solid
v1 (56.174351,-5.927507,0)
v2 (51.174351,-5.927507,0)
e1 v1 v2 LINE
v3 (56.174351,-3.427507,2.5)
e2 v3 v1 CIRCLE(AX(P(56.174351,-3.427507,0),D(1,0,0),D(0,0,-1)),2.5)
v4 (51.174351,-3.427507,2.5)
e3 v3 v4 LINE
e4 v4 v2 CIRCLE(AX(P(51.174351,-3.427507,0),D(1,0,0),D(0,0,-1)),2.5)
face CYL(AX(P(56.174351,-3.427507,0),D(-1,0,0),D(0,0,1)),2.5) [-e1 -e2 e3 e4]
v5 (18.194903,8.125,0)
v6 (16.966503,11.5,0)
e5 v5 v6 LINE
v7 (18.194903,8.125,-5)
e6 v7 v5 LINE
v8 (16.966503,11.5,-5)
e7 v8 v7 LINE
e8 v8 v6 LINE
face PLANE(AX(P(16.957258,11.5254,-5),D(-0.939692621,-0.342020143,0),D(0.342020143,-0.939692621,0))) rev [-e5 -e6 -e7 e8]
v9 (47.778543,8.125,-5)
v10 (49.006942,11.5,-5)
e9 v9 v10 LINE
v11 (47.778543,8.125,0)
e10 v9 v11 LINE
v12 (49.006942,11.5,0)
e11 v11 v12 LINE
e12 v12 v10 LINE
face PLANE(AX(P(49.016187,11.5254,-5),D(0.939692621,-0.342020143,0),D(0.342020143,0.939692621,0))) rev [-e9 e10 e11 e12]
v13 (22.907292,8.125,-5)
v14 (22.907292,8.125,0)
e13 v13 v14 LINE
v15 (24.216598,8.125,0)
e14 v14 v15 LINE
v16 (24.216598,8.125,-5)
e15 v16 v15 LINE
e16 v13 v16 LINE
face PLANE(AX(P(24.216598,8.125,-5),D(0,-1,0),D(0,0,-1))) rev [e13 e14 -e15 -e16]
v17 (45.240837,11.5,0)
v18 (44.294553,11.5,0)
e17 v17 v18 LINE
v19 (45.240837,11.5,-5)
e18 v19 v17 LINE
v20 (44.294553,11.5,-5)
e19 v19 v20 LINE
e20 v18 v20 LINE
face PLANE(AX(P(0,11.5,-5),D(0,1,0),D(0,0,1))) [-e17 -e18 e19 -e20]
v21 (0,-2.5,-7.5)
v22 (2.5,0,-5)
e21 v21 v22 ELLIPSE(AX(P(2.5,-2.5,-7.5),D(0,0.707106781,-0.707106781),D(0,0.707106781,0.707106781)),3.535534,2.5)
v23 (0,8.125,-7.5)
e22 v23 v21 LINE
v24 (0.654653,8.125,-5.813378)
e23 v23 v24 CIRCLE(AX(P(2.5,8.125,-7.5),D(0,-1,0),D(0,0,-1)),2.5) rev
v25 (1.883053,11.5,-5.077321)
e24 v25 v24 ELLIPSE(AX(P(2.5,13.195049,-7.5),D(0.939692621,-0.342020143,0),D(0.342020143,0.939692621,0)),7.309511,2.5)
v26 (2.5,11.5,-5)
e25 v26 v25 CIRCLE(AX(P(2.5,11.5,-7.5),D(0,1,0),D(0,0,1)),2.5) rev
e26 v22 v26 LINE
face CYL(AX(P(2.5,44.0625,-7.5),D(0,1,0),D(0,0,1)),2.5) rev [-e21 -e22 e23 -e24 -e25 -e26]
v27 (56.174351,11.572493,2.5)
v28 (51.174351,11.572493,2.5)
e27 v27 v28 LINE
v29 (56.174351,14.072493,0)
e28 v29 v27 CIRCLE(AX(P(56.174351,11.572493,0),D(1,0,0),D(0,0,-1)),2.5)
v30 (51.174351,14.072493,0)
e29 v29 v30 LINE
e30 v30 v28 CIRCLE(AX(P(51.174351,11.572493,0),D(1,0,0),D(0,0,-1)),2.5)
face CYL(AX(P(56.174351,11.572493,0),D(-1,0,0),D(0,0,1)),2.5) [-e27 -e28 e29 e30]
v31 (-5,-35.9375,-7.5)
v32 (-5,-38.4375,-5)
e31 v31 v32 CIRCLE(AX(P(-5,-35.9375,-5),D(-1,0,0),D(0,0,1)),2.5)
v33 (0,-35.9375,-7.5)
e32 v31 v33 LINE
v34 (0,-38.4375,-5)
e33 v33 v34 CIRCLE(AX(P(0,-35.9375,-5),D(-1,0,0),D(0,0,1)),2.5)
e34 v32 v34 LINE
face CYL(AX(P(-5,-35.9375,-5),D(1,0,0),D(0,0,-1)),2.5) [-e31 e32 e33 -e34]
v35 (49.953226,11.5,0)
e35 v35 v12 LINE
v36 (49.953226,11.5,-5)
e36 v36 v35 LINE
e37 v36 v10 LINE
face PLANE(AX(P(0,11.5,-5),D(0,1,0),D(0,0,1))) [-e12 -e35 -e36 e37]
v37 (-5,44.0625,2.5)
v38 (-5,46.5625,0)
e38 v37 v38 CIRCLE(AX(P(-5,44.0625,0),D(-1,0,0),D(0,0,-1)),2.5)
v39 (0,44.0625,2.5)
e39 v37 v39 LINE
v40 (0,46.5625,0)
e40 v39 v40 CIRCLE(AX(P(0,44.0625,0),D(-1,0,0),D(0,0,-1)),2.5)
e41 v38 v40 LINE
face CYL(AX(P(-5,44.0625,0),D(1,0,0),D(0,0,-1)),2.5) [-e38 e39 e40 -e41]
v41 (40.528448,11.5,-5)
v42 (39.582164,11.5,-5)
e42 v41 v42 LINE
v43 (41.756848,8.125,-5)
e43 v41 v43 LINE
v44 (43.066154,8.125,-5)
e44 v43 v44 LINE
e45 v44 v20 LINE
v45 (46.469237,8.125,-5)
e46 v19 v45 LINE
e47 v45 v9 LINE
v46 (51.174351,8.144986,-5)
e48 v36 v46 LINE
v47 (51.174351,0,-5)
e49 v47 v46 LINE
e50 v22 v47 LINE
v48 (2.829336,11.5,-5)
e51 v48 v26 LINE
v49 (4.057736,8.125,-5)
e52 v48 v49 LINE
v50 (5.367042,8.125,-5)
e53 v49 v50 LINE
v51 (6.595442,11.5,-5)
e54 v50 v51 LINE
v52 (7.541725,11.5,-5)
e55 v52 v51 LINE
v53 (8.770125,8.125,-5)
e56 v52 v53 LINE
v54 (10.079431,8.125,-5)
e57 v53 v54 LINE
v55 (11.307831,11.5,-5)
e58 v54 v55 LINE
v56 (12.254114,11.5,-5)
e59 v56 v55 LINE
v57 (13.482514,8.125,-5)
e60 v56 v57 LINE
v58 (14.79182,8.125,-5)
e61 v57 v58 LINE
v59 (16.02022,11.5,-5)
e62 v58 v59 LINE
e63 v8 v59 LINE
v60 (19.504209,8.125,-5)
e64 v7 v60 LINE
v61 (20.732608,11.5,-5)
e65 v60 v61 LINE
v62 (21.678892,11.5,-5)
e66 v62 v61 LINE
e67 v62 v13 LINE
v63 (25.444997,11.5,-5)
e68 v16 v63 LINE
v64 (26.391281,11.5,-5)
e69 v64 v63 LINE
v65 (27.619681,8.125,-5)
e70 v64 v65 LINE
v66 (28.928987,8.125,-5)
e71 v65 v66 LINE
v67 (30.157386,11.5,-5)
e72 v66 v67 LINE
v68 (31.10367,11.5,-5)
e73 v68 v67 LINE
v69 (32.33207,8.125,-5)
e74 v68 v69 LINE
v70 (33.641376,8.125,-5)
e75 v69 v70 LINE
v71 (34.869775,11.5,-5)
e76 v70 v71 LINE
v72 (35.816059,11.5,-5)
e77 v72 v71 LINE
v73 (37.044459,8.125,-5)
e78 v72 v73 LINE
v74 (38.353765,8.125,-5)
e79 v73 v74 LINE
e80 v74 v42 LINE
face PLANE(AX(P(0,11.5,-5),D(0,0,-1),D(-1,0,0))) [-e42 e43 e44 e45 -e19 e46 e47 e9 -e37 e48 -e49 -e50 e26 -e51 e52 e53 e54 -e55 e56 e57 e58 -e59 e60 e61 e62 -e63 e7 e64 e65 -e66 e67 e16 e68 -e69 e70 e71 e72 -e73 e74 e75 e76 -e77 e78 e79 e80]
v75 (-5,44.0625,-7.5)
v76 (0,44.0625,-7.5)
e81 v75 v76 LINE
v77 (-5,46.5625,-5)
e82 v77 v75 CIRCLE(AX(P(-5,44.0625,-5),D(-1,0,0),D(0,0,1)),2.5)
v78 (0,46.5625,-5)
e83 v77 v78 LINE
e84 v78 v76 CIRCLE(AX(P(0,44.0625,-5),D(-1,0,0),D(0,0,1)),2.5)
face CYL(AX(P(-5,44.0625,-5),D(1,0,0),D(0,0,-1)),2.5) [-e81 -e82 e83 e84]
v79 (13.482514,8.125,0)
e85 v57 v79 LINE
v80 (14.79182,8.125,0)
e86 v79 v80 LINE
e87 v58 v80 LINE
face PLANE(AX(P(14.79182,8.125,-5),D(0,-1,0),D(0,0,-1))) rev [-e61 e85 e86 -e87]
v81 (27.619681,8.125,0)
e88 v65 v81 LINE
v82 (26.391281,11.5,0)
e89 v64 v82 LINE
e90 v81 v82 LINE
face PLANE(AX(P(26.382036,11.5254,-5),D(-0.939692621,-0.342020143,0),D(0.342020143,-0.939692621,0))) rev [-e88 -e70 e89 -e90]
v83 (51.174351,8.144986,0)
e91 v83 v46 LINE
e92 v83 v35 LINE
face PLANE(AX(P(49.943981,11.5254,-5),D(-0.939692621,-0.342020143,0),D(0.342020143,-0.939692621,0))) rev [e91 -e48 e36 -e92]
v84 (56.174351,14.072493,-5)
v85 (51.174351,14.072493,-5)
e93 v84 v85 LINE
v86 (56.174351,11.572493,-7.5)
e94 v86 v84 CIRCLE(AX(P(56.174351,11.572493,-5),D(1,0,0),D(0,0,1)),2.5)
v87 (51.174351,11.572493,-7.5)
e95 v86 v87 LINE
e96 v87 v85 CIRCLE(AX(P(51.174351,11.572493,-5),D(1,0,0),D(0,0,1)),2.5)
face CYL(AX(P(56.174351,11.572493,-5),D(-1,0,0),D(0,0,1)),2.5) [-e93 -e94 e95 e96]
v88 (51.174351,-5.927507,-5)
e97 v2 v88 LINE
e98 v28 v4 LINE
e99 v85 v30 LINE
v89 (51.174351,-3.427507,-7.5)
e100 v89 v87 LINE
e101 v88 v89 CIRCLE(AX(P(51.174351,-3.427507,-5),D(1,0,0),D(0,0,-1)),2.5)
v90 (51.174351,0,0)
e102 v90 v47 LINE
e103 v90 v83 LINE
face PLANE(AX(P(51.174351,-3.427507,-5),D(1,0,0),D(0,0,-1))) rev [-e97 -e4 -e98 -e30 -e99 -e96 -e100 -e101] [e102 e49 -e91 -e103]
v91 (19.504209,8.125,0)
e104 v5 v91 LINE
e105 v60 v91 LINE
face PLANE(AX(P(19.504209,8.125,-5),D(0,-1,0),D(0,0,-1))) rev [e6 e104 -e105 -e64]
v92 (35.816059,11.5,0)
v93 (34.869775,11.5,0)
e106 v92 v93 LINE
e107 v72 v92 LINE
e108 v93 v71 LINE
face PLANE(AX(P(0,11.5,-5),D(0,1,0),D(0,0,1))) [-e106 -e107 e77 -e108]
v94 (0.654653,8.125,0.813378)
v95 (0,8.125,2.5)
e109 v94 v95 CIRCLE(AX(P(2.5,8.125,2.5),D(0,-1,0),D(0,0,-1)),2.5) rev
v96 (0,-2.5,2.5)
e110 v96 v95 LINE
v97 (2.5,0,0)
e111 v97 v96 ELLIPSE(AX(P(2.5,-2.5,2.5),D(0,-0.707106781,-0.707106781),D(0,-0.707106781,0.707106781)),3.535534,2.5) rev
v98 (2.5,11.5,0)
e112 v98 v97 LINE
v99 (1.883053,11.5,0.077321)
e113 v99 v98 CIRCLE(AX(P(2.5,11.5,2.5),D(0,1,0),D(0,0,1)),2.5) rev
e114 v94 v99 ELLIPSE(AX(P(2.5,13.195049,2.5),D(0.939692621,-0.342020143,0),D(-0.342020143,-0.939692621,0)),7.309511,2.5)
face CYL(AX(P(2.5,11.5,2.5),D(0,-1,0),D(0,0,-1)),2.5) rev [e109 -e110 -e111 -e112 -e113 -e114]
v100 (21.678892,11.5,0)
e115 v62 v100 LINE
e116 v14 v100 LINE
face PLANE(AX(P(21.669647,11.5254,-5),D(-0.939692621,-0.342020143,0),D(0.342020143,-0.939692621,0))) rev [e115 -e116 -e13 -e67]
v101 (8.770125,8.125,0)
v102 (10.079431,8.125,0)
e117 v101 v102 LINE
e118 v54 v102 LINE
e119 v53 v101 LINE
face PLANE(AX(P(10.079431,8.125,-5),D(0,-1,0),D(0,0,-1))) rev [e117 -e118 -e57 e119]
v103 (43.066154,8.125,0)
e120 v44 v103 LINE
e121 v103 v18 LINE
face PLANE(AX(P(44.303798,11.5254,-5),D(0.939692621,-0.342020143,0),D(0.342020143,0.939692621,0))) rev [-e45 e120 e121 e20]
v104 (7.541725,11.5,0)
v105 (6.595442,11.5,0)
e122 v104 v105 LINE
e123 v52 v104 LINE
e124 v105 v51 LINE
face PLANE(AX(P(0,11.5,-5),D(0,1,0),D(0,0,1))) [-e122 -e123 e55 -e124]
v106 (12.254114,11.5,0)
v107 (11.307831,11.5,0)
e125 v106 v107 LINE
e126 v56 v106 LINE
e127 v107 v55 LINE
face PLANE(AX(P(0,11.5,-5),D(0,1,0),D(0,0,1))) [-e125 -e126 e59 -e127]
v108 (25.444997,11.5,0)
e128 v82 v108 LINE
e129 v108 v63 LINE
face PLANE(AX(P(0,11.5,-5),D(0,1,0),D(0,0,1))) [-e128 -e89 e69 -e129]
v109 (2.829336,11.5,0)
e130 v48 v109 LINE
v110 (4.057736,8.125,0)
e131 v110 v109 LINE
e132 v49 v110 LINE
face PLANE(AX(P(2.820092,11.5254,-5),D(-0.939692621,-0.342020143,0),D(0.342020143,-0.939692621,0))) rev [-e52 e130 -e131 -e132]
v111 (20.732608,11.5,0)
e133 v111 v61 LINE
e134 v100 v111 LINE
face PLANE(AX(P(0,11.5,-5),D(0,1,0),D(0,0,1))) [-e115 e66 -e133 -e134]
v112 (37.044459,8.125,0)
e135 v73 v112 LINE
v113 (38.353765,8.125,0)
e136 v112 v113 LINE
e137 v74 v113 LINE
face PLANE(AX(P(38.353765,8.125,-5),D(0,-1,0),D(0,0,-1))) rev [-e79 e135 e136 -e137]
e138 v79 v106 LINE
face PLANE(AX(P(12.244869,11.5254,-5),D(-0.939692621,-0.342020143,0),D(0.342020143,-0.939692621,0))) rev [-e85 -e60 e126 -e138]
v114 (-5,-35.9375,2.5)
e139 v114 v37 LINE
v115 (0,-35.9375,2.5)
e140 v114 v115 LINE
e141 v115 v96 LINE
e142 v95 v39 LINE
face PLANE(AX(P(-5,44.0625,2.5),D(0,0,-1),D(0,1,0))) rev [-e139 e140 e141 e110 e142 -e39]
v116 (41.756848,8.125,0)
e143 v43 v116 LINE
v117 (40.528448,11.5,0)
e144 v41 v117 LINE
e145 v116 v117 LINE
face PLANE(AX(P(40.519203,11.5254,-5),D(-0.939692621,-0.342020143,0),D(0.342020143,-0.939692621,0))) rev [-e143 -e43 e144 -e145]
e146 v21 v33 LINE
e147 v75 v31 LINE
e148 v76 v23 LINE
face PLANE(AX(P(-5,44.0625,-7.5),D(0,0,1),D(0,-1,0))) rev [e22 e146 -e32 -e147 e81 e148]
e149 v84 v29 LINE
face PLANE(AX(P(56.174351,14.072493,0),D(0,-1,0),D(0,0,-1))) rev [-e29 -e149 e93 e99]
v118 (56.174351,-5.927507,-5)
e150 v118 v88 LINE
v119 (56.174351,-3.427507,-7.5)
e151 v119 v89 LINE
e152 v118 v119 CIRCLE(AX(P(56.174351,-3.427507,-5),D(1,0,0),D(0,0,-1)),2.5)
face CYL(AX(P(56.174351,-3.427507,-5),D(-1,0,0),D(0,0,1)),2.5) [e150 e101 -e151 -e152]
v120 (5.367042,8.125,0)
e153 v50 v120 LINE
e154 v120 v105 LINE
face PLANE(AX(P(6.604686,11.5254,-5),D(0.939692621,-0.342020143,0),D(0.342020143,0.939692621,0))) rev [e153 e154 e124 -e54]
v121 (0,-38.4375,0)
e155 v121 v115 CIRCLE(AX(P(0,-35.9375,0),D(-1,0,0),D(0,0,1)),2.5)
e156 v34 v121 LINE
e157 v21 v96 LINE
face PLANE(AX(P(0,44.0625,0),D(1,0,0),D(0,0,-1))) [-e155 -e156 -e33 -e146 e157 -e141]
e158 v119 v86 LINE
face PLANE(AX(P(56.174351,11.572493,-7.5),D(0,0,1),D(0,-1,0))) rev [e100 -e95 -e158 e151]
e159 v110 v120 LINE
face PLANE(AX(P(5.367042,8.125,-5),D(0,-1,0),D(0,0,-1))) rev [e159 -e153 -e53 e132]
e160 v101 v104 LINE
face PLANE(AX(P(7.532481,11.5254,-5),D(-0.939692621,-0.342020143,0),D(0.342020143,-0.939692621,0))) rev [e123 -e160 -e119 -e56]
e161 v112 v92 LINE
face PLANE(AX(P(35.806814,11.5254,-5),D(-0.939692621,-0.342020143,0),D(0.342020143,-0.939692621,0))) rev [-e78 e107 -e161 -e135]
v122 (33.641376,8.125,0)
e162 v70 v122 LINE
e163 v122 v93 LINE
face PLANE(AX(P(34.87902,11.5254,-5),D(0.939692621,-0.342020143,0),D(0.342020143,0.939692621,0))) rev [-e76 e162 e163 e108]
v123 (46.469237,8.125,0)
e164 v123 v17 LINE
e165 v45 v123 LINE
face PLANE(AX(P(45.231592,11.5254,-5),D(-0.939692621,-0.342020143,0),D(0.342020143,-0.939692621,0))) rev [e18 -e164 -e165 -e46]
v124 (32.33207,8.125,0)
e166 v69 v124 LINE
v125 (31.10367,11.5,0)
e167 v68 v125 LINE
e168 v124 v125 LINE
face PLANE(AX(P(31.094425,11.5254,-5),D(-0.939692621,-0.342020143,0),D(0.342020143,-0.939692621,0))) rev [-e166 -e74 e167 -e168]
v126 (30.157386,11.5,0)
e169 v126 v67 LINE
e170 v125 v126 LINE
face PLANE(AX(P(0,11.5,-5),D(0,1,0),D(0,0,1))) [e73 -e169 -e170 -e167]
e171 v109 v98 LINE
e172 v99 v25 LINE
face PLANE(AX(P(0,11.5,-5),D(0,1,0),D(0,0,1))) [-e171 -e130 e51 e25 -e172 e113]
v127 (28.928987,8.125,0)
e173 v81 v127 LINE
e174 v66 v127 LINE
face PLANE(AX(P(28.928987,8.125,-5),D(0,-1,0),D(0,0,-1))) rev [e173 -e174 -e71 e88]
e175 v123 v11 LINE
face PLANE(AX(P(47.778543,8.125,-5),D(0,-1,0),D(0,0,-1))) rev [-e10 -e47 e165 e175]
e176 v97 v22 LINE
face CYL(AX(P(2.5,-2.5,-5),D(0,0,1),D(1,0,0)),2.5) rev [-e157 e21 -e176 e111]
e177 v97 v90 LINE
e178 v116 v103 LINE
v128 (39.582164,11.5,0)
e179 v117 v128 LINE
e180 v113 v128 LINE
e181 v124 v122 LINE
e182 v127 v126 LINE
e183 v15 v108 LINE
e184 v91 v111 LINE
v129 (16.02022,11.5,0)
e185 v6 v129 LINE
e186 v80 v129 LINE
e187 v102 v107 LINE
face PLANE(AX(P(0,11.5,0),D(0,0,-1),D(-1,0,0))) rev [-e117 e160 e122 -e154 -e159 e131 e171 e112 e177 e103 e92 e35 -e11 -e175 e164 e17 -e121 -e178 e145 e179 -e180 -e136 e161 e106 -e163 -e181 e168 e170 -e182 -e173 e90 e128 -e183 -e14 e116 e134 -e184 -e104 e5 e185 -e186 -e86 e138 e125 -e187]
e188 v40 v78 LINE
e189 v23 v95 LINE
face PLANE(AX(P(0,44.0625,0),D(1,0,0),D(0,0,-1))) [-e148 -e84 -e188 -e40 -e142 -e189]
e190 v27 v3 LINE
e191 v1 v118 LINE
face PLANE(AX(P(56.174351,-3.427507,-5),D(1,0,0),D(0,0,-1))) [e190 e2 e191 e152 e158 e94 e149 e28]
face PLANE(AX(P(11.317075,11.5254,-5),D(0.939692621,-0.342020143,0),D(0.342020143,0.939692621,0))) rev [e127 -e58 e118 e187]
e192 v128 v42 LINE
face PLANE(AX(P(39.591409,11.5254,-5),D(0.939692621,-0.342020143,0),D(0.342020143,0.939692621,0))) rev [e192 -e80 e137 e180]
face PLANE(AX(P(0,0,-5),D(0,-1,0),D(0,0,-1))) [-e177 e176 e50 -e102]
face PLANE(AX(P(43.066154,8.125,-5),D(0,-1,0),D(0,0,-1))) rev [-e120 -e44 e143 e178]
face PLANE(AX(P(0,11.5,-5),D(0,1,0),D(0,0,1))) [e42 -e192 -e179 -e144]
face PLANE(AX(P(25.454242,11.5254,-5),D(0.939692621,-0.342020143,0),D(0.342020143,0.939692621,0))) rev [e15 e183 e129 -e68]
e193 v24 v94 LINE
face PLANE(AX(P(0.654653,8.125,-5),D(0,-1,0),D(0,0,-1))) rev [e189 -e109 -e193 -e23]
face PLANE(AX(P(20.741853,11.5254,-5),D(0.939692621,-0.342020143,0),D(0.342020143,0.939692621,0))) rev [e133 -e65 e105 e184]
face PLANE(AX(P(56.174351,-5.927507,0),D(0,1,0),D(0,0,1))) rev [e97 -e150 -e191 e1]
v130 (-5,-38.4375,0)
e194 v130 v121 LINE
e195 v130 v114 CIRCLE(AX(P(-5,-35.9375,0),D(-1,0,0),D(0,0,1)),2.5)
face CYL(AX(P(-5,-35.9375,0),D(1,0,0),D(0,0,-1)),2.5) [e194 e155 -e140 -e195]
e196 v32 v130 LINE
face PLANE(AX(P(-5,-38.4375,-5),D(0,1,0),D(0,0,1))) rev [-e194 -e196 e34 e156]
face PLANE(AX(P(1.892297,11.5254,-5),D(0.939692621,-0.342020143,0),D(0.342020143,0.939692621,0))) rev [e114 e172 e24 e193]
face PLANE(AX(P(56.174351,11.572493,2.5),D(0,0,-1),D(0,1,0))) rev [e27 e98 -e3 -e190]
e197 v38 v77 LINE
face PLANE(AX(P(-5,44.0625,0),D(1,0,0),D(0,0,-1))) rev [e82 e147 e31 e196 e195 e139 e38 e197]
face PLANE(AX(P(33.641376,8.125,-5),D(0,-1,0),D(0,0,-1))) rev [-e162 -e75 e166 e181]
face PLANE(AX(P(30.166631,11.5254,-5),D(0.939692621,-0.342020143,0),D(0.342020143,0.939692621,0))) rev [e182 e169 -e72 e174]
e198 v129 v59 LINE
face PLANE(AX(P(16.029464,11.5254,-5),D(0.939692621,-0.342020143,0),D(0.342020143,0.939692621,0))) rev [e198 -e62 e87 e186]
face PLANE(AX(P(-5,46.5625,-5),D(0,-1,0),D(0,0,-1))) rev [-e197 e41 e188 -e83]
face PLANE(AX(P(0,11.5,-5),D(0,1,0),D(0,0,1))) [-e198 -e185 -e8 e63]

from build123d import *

# Parameters (mm, degrees)
BLANKSKE_W                   = 100
BLANKSKE_H                   = 11.5
BLANK_DEPTH                  = 5
TOOTHCUTSIM_DEPTH            = 101.783183121
TEETHCUTS_COUNT              = 22
TEETHCUTS_PITCH              = 4.712388975
BOSS_EXTRU_1_DEPTH           = 5
BOSS_EXTRU_2_DEPTH           = 5
CONG_2_R                     = 2.5
CONG_3_R                     = 2.5
CONG_4_R                     = 2.5
ENL_V_MAT_EXTRU_1_DEPTH      = 116.139334748
ENL_V_MAT_EXTRU_1_DEPTH_BACK = 116.139334748
ESQUISSE4_W                  = 53.825648792
ESQUISSE4_H                  = 17.774257486
BOSS_EXTRU_3_DEPTH           = 5


with BuildPart() as part:
    # BlankSke → Blank (new body)
    with BuildSketch(Plane.XY):
        with Locations((50, 5.75)):
            Rectangle(BLANKSKE_W, BLANKSKE_H)
    extrude(amount=-BLANK_DEPTH)

    # TooCutSkeSim → ToothCutSim (cut, through all)
    with BuildSketch(Plane.XY):
        Polygon((0.654653055, 8.125), (-0.654653055, 8.125), (-1.892297439, 11.5254), (1.892297439, 11.5254), align=None)
    toothcutsim = extrude(amount=-TOOTHCUTSIM_DEPTH, mode=Mode.SUBTRACT)

    # TeethCuts: ToothCutSim ×22
    with Locations(*[(i * TEETHCUTS_PITCH, 0, 0) for i in range(1, TEETHCUTS_COUNT)]):
        add(toothcutsim, mode=Mode.SUBTRACT)

    # Esquisse1 → Boss.-Extru.1 (add)
    with BuildSketch(Plane(origin=(100, 0, 0), x_dir=(0, 0, -1), z_dir=(1, 0, 0))):
        with BuildLine():
            Line((5, 12.18326915), (0, 12.18326915))
            ThreePointArc((0, 12.18326915), (-2.121320344, 11.304589494), (-3, 9.18326915))
            Line((-3, 9.18326915), (-3, 0))
            ThreePointArc((-3, 0), (-2.121320344, -2.121320344), (0, -3))
            Line((0, -3), (5, -3))
            ThreePointArc((5, -3), (7.121320344, -2.121320344), (8, 0))
            Line((8, 0), (8, 9.18326915))
            ThreePointArc((8, 9.18326915), (7.121320344, 11.304589494), (5, 12.18326915))
        make_face()
    extrude(amount=BOSS_EXTRU_1_DEPTH)

    # Esquisse2 → Boss.-Extru.2 (add)
    with BuildSketch(Plane.ZY):
        with BuildLine():
            Line((-5, 46.5625), (0, 46.5625))
            ThreePointArc((0, 46.5625), (1.767766953, 45.830266953), (2.5, 44.0625))
            Line((2.5, 44.0625), (2.5, -35.9375))
            ThreePointArc((2.5, -35.9375), (1.767766953, -37.705266953), (0, -38.4375))
            Line((0, -38.4375), (-5, -38.4375))
            ThreePointArc((-5, -38.4375), (-6.767766953, -37.705266953), (-7.5, -35.9375))
            Line((-7.5, -35.9375), (-7.5, 44.0625))
            ThreePointArc((-7.5, 44.0625), (-6.767766953, 45.830266953), (-5, 46.5625))
        make_face()
    extrude(amount=BOSS_EXTRU_2_DEPTH)

    # Congé2
    cong_2_edges = [part.edges().sort_by_distance(p)[0] for p in [
        (0, 4.0625, -5),
    ]]
    fillet(cong_2_edges, radius=CONG_2_R - 0.0001)  # a hair under: the kernel refuses the full size

    # Congé3
    cong_3_edges = [part.edges().sort_by_distance(p)[0] for p in [
        (0, 4.0625, 0),
    ]]
    fillet(cong_3_edges, radius=CONG_3_R - 0.0001)  # a hair under: the kernel refuses the full size

    # Congé4
    cong_4_edges = [part.edges().sort_by_distance(p)[0] for p in [
        (0, 0, -2.5),
    ]]
    fillet(cong_4_edges, radius=CONG_4_R)

    # Esquisse4 → Enlèv. mat.-Extru.1 (cut, two sides: drawn at the far end of the back side and taken through both)
    with BuildSketch(Plane(origin=(0, 0, -5), x_dir=(-1, 0, 0), z_dir=(0, 0, -1)).offset(-ENL_V_MAT_EXTRU_1_DEPTH_BACK)):
        with Locations((-78.087175604, 5.887128743)):
            Rectangle(ESQUISSE4_W, ESQUISSE4_H)
    extrude(amount=ENL_V_MAT_EXTRU_1_DEPTH + ENL_V_MAT_EXTRU_1_DEPTH_BACK, mode=Mode.SUBTRACT)

    # Esquisse5 → Boss.-Extru.3 (add)
    with BuildSketch(Plane(origin=(51.174351208, 0, 0), x_dir=(0, 0, -1), z_dir=(1, 0, 0))):
        with BuildLine():
            Line((0, 14.07249321), (5, 14.07249321))
            ThreePointArc((5, 14.07249321), (6.767766953, 13.340260163), (7.5, 11.57249321))
            Line((7.5, 11.57249321), (7.5, -3.42750679))
            ThreePointArc((7.5, -3.42750679), (6.767766953, -5.195273743), (5, -5.92750679))
            Line((5, -5.92750679), (0, -5.92750679))
            ThreePointArc((0, -5.92750679), (-1.767766953, -5.195273743), (-2.5, -3.42750679))
            Line((-2.5, -3.42750679), (-2.5, 11.57249321))
            ThreePointArc((-2.5, 11.57249321), (-1.767766953, 13.340260163), (0, 14.07249321))
        make_face()
    extrude(amount=BOSS_EXTRU_3_DEPTH)


solid = part.part
